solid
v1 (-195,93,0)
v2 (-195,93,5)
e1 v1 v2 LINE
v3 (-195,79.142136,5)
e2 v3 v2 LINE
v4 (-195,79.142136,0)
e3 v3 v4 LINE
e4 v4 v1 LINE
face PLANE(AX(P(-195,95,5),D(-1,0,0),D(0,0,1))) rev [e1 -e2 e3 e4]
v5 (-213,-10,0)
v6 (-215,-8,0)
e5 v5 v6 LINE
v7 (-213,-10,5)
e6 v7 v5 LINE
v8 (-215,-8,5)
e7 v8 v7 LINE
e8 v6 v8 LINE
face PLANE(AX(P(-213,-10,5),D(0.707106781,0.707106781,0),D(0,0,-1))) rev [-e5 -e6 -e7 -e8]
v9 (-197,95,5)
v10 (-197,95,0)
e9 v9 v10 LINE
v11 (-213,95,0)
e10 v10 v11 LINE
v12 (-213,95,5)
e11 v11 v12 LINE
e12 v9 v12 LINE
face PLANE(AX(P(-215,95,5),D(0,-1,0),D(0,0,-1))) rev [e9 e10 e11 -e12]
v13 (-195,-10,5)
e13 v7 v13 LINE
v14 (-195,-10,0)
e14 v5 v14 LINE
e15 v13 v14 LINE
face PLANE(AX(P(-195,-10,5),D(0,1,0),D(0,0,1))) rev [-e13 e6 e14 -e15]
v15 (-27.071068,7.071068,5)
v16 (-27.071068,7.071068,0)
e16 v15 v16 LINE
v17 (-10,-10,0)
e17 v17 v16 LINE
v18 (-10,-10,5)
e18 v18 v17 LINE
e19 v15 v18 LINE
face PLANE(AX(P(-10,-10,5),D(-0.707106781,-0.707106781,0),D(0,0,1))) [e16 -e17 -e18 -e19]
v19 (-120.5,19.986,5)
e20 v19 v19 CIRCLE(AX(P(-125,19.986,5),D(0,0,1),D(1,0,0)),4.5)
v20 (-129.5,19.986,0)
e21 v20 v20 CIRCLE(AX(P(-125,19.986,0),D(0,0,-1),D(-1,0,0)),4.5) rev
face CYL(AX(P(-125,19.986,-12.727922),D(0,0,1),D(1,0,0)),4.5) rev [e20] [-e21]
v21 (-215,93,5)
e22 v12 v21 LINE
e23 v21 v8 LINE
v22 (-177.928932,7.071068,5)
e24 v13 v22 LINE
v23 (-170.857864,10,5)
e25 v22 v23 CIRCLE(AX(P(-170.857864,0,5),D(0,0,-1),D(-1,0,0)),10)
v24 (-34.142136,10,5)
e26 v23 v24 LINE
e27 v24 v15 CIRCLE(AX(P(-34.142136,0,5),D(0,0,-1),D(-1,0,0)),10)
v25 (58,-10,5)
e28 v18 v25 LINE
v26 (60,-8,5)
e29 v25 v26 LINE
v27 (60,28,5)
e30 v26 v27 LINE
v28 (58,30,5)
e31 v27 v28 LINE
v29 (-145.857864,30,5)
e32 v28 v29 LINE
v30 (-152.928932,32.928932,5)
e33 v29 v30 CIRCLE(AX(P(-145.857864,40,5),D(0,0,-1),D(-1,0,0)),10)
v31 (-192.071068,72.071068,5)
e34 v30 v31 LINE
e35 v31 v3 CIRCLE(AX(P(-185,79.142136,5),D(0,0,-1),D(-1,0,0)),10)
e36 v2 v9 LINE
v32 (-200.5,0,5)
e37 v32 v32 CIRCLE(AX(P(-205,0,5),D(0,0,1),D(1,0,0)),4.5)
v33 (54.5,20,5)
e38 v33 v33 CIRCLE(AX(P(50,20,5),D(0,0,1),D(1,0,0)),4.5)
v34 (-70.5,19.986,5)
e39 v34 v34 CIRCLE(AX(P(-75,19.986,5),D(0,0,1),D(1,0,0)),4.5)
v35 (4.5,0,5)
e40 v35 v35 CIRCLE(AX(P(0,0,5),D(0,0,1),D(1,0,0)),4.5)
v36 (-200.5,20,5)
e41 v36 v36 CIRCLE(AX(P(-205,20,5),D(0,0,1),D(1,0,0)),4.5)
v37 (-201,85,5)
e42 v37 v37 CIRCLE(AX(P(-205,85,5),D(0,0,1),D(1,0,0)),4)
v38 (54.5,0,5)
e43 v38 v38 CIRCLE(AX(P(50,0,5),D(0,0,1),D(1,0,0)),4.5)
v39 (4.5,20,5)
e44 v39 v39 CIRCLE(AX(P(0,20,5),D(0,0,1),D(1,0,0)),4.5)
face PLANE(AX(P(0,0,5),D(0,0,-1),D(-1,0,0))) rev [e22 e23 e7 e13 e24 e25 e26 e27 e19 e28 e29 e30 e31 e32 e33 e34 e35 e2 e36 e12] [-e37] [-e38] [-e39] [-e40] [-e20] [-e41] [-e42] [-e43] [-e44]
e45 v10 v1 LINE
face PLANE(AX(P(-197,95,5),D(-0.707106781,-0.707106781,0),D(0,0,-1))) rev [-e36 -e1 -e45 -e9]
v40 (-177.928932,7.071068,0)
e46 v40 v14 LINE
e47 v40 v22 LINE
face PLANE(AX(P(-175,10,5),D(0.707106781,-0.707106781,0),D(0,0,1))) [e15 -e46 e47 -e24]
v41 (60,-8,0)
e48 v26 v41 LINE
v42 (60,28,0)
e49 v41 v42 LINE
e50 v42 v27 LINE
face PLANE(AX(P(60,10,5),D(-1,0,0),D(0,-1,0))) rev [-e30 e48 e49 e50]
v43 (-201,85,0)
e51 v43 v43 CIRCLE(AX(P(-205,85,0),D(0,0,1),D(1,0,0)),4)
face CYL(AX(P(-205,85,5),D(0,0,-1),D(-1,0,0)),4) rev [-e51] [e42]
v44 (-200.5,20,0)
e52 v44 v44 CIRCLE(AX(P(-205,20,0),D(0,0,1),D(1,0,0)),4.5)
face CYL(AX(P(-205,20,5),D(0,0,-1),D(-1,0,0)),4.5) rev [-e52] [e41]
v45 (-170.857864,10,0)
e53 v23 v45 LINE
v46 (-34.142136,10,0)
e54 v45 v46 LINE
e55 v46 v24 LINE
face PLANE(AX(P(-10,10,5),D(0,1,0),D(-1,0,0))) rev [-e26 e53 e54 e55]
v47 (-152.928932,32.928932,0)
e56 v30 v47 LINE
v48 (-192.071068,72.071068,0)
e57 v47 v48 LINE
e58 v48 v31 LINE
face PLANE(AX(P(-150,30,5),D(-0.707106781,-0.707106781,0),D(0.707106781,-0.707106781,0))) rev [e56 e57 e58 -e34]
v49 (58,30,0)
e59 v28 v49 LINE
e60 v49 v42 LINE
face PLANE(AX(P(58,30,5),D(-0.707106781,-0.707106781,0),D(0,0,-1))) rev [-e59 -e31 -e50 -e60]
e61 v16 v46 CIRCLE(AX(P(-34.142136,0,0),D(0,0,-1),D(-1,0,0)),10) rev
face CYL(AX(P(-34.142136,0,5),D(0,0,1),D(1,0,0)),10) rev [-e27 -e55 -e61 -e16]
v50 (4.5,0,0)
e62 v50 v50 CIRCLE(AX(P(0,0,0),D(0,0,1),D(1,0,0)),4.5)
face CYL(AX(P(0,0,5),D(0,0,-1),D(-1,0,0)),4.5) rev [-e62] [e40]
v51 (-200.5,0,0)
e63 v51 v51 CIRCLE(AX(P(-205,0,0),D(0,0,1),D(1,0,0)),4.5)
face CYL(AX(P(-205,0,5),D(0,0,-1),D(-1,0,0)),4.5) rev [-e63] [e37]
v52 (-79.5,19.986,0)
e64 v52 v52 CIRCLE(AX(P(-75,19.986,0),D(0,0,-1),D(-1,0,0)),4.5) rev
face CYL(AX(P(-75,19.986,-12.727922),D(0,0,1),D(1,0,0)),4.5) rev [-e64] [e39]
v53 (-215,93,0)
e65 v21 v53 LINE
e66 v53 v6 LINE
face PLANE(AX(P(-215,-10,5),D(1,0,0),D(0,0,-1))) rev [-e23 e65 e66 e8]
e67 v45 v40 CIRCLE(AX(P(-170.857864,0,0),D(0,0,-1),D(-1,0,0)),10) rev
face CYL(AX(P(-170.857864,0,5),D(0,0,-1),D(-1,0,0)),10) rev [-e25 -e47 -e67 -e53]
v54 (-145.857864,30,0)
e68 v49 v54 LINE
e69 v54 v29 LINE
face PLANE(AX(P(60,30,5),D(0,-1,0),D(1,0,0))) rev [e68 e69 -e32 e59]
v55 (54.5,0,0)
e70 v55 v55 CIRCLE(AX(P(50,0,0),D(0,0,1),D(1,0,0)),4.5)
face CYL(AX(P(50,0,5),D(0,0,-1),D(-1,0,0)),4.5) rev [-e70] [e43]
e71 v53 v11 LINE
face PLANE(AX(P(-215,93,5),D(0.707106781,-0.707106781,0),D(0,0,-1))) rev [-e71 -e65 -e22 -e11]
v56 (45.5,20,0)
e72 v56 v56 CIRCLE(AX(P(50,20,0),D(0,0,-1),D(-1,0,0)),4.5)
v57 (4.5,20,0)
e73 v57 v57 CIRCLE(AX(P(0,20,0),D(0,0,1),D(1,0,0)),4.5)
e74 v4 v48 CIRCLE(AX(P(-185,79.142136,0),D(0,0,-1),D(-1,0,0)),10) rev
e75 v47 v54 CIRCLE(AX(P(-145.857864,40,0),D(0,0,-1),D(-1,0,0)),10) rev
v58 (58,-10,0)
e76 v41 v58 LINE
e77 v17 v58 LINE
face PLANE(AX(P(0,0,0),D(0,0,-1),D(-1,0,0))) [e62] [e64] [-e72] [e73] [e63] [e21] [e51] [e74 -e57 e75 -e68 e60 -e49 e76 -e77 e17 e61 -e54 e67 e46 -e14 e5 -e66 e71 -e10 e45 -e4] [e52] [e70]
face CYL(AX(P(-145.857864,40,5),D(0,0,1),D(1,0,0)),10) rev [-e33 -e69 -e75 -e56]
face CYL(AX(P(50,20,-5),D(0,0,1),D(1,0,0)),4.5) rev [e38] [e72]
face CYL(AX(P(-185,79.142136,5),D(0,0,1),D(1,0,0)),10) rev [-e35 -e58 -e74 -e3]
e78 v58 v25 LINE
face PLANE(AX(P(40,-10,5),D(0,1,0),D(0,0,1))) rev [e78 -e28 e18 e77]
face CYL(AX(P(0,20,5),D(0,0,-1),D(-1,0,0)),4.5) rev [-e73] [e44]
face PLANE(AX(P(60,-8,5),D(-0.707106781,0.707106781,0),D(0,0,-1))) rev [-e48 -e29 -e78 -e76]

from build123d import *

# Parameters (mm, degrees)
SKETCH_1_R          = 4.5
SKETCH_1_R_2        = 4
EXTRUDE_1_DEPTH     = 5
CHAMFER_2_SIZE      = 20
CHAMFER_3_SIZE      = 20
SKETCH_2_R          = 4.5
CUT_EXTRUDE_1_DEPTH = 5
FILLET_1_R          = 10
CHAMFER_4_SIZE      = 2
SKETCH_3_R          = 4.5
CUT_EXTRUDE_2_DEPTH = 10


with BuildPart() as part:
    # 草图1 → 凸台-拉伸1 (new body)
    with BuildSketch(Plane.XY):
        Polygon((-215, 70), (-215, 75), (-215, 95), (-195, 95), (-195, 75), (-150, 30), (60, 30), (60, 10), (60, -10), (40, -10), (10, -10), (-10, -10), (-10, 10), (-195, 10), (-195, -10), (-215, -10), (-215, 10), align=None)
        Circle(SKETCH_1_R, mode=Mode.SUBTRACT)
        with Locations((50, 0)):
            Circle(SKETCH_1_R, mode=Mode.SUBTRACT)
        with Locations((-205, 20)):
            Circle(SKETCH_1_R, mode=Mode.SUBTRACT)
        with Locations((0, 20)):
            Circle(SKETCH_1_R, mode=Mode.SUBTRACT)
        with Locations((-205, 0)):
            Circle(SKETCH_1_R, mode=Mode.SUBTRACT)
        with Locations((-205, 85)):
            Circle(SKETCH_1_R_2, mode=Mode.SUBTRACT)
    extrude(amount=EXTRUDE_1_DEPTH)

    # 倒角2
    chamfer_2_edges = [part.edges().sort_by_distance(p)[0] for p in [
        (-10, 10, 2.5),
    ]]
    chamfer(chamfer_2_edges, length=CHAMFER_2_SIZE - 0.0001)  # a hair under: the kernel refuses the full size

    # 倒角3
    chamfer_3_edges = [part.edges().sort_by_distance(p)[0] for p in [
        (-195, 10, 2.5),
    ]]
    chamfer(chamfer_3_edges, length=CHAMFER_3_SIZE - 0.0001)  # a hair under: the kernel refuses the full size

    # 草图2 → 切除-拉伸1 (cut)
    with BuildSketch(Plane.XY.offset(5)):
        with Locations((-125, 19.986)):
            Circle(SKETCH_2_R)
        with Locations((-75, 19.986)):
            Circle(SKETCH_2_R)
    extrude(amount=-CUT_EXTRUDE_1_DEPTH, mode=Mode.SUBTRACT)

    # 圆角1
    fillet_1_edges = [part.edges().sort_by_distance(p)[0] for p in [
        (-195, 75, 2.5),
        (-150, 30, 2.5),
        (-29.9999, 10, 2.5),
        (-175.0001, 10, 2.5),
    ]]
    fillet(fillet_1_edges, radius=FILLET_1_R)

    # 倒角4
    chamfer_4_edges = [part.edges().sort_by_distance(p)[0] for p in [
        (60, 30, 2.5),
        (60, -10, 2.5),
        (-215, -10, 2.5),
        (-215, 95, 2.5),
        (-195, 95, 2.5),
    ]]
    chamfer(chamfer_4_edges, length=CHAMFER_4_SIZE)

    # 草图3 → 切除-拉伸2 (cut)
    with BuildSketch(Plane.XY.offset(5)):
        with Locations((50, 20)):
            Circle(SKETCH_3_R)
    extrude(amount=-CUT_EXTRUDE_2_DEPTH, mode=Mode.SUBTRACT)


solid = part.part
